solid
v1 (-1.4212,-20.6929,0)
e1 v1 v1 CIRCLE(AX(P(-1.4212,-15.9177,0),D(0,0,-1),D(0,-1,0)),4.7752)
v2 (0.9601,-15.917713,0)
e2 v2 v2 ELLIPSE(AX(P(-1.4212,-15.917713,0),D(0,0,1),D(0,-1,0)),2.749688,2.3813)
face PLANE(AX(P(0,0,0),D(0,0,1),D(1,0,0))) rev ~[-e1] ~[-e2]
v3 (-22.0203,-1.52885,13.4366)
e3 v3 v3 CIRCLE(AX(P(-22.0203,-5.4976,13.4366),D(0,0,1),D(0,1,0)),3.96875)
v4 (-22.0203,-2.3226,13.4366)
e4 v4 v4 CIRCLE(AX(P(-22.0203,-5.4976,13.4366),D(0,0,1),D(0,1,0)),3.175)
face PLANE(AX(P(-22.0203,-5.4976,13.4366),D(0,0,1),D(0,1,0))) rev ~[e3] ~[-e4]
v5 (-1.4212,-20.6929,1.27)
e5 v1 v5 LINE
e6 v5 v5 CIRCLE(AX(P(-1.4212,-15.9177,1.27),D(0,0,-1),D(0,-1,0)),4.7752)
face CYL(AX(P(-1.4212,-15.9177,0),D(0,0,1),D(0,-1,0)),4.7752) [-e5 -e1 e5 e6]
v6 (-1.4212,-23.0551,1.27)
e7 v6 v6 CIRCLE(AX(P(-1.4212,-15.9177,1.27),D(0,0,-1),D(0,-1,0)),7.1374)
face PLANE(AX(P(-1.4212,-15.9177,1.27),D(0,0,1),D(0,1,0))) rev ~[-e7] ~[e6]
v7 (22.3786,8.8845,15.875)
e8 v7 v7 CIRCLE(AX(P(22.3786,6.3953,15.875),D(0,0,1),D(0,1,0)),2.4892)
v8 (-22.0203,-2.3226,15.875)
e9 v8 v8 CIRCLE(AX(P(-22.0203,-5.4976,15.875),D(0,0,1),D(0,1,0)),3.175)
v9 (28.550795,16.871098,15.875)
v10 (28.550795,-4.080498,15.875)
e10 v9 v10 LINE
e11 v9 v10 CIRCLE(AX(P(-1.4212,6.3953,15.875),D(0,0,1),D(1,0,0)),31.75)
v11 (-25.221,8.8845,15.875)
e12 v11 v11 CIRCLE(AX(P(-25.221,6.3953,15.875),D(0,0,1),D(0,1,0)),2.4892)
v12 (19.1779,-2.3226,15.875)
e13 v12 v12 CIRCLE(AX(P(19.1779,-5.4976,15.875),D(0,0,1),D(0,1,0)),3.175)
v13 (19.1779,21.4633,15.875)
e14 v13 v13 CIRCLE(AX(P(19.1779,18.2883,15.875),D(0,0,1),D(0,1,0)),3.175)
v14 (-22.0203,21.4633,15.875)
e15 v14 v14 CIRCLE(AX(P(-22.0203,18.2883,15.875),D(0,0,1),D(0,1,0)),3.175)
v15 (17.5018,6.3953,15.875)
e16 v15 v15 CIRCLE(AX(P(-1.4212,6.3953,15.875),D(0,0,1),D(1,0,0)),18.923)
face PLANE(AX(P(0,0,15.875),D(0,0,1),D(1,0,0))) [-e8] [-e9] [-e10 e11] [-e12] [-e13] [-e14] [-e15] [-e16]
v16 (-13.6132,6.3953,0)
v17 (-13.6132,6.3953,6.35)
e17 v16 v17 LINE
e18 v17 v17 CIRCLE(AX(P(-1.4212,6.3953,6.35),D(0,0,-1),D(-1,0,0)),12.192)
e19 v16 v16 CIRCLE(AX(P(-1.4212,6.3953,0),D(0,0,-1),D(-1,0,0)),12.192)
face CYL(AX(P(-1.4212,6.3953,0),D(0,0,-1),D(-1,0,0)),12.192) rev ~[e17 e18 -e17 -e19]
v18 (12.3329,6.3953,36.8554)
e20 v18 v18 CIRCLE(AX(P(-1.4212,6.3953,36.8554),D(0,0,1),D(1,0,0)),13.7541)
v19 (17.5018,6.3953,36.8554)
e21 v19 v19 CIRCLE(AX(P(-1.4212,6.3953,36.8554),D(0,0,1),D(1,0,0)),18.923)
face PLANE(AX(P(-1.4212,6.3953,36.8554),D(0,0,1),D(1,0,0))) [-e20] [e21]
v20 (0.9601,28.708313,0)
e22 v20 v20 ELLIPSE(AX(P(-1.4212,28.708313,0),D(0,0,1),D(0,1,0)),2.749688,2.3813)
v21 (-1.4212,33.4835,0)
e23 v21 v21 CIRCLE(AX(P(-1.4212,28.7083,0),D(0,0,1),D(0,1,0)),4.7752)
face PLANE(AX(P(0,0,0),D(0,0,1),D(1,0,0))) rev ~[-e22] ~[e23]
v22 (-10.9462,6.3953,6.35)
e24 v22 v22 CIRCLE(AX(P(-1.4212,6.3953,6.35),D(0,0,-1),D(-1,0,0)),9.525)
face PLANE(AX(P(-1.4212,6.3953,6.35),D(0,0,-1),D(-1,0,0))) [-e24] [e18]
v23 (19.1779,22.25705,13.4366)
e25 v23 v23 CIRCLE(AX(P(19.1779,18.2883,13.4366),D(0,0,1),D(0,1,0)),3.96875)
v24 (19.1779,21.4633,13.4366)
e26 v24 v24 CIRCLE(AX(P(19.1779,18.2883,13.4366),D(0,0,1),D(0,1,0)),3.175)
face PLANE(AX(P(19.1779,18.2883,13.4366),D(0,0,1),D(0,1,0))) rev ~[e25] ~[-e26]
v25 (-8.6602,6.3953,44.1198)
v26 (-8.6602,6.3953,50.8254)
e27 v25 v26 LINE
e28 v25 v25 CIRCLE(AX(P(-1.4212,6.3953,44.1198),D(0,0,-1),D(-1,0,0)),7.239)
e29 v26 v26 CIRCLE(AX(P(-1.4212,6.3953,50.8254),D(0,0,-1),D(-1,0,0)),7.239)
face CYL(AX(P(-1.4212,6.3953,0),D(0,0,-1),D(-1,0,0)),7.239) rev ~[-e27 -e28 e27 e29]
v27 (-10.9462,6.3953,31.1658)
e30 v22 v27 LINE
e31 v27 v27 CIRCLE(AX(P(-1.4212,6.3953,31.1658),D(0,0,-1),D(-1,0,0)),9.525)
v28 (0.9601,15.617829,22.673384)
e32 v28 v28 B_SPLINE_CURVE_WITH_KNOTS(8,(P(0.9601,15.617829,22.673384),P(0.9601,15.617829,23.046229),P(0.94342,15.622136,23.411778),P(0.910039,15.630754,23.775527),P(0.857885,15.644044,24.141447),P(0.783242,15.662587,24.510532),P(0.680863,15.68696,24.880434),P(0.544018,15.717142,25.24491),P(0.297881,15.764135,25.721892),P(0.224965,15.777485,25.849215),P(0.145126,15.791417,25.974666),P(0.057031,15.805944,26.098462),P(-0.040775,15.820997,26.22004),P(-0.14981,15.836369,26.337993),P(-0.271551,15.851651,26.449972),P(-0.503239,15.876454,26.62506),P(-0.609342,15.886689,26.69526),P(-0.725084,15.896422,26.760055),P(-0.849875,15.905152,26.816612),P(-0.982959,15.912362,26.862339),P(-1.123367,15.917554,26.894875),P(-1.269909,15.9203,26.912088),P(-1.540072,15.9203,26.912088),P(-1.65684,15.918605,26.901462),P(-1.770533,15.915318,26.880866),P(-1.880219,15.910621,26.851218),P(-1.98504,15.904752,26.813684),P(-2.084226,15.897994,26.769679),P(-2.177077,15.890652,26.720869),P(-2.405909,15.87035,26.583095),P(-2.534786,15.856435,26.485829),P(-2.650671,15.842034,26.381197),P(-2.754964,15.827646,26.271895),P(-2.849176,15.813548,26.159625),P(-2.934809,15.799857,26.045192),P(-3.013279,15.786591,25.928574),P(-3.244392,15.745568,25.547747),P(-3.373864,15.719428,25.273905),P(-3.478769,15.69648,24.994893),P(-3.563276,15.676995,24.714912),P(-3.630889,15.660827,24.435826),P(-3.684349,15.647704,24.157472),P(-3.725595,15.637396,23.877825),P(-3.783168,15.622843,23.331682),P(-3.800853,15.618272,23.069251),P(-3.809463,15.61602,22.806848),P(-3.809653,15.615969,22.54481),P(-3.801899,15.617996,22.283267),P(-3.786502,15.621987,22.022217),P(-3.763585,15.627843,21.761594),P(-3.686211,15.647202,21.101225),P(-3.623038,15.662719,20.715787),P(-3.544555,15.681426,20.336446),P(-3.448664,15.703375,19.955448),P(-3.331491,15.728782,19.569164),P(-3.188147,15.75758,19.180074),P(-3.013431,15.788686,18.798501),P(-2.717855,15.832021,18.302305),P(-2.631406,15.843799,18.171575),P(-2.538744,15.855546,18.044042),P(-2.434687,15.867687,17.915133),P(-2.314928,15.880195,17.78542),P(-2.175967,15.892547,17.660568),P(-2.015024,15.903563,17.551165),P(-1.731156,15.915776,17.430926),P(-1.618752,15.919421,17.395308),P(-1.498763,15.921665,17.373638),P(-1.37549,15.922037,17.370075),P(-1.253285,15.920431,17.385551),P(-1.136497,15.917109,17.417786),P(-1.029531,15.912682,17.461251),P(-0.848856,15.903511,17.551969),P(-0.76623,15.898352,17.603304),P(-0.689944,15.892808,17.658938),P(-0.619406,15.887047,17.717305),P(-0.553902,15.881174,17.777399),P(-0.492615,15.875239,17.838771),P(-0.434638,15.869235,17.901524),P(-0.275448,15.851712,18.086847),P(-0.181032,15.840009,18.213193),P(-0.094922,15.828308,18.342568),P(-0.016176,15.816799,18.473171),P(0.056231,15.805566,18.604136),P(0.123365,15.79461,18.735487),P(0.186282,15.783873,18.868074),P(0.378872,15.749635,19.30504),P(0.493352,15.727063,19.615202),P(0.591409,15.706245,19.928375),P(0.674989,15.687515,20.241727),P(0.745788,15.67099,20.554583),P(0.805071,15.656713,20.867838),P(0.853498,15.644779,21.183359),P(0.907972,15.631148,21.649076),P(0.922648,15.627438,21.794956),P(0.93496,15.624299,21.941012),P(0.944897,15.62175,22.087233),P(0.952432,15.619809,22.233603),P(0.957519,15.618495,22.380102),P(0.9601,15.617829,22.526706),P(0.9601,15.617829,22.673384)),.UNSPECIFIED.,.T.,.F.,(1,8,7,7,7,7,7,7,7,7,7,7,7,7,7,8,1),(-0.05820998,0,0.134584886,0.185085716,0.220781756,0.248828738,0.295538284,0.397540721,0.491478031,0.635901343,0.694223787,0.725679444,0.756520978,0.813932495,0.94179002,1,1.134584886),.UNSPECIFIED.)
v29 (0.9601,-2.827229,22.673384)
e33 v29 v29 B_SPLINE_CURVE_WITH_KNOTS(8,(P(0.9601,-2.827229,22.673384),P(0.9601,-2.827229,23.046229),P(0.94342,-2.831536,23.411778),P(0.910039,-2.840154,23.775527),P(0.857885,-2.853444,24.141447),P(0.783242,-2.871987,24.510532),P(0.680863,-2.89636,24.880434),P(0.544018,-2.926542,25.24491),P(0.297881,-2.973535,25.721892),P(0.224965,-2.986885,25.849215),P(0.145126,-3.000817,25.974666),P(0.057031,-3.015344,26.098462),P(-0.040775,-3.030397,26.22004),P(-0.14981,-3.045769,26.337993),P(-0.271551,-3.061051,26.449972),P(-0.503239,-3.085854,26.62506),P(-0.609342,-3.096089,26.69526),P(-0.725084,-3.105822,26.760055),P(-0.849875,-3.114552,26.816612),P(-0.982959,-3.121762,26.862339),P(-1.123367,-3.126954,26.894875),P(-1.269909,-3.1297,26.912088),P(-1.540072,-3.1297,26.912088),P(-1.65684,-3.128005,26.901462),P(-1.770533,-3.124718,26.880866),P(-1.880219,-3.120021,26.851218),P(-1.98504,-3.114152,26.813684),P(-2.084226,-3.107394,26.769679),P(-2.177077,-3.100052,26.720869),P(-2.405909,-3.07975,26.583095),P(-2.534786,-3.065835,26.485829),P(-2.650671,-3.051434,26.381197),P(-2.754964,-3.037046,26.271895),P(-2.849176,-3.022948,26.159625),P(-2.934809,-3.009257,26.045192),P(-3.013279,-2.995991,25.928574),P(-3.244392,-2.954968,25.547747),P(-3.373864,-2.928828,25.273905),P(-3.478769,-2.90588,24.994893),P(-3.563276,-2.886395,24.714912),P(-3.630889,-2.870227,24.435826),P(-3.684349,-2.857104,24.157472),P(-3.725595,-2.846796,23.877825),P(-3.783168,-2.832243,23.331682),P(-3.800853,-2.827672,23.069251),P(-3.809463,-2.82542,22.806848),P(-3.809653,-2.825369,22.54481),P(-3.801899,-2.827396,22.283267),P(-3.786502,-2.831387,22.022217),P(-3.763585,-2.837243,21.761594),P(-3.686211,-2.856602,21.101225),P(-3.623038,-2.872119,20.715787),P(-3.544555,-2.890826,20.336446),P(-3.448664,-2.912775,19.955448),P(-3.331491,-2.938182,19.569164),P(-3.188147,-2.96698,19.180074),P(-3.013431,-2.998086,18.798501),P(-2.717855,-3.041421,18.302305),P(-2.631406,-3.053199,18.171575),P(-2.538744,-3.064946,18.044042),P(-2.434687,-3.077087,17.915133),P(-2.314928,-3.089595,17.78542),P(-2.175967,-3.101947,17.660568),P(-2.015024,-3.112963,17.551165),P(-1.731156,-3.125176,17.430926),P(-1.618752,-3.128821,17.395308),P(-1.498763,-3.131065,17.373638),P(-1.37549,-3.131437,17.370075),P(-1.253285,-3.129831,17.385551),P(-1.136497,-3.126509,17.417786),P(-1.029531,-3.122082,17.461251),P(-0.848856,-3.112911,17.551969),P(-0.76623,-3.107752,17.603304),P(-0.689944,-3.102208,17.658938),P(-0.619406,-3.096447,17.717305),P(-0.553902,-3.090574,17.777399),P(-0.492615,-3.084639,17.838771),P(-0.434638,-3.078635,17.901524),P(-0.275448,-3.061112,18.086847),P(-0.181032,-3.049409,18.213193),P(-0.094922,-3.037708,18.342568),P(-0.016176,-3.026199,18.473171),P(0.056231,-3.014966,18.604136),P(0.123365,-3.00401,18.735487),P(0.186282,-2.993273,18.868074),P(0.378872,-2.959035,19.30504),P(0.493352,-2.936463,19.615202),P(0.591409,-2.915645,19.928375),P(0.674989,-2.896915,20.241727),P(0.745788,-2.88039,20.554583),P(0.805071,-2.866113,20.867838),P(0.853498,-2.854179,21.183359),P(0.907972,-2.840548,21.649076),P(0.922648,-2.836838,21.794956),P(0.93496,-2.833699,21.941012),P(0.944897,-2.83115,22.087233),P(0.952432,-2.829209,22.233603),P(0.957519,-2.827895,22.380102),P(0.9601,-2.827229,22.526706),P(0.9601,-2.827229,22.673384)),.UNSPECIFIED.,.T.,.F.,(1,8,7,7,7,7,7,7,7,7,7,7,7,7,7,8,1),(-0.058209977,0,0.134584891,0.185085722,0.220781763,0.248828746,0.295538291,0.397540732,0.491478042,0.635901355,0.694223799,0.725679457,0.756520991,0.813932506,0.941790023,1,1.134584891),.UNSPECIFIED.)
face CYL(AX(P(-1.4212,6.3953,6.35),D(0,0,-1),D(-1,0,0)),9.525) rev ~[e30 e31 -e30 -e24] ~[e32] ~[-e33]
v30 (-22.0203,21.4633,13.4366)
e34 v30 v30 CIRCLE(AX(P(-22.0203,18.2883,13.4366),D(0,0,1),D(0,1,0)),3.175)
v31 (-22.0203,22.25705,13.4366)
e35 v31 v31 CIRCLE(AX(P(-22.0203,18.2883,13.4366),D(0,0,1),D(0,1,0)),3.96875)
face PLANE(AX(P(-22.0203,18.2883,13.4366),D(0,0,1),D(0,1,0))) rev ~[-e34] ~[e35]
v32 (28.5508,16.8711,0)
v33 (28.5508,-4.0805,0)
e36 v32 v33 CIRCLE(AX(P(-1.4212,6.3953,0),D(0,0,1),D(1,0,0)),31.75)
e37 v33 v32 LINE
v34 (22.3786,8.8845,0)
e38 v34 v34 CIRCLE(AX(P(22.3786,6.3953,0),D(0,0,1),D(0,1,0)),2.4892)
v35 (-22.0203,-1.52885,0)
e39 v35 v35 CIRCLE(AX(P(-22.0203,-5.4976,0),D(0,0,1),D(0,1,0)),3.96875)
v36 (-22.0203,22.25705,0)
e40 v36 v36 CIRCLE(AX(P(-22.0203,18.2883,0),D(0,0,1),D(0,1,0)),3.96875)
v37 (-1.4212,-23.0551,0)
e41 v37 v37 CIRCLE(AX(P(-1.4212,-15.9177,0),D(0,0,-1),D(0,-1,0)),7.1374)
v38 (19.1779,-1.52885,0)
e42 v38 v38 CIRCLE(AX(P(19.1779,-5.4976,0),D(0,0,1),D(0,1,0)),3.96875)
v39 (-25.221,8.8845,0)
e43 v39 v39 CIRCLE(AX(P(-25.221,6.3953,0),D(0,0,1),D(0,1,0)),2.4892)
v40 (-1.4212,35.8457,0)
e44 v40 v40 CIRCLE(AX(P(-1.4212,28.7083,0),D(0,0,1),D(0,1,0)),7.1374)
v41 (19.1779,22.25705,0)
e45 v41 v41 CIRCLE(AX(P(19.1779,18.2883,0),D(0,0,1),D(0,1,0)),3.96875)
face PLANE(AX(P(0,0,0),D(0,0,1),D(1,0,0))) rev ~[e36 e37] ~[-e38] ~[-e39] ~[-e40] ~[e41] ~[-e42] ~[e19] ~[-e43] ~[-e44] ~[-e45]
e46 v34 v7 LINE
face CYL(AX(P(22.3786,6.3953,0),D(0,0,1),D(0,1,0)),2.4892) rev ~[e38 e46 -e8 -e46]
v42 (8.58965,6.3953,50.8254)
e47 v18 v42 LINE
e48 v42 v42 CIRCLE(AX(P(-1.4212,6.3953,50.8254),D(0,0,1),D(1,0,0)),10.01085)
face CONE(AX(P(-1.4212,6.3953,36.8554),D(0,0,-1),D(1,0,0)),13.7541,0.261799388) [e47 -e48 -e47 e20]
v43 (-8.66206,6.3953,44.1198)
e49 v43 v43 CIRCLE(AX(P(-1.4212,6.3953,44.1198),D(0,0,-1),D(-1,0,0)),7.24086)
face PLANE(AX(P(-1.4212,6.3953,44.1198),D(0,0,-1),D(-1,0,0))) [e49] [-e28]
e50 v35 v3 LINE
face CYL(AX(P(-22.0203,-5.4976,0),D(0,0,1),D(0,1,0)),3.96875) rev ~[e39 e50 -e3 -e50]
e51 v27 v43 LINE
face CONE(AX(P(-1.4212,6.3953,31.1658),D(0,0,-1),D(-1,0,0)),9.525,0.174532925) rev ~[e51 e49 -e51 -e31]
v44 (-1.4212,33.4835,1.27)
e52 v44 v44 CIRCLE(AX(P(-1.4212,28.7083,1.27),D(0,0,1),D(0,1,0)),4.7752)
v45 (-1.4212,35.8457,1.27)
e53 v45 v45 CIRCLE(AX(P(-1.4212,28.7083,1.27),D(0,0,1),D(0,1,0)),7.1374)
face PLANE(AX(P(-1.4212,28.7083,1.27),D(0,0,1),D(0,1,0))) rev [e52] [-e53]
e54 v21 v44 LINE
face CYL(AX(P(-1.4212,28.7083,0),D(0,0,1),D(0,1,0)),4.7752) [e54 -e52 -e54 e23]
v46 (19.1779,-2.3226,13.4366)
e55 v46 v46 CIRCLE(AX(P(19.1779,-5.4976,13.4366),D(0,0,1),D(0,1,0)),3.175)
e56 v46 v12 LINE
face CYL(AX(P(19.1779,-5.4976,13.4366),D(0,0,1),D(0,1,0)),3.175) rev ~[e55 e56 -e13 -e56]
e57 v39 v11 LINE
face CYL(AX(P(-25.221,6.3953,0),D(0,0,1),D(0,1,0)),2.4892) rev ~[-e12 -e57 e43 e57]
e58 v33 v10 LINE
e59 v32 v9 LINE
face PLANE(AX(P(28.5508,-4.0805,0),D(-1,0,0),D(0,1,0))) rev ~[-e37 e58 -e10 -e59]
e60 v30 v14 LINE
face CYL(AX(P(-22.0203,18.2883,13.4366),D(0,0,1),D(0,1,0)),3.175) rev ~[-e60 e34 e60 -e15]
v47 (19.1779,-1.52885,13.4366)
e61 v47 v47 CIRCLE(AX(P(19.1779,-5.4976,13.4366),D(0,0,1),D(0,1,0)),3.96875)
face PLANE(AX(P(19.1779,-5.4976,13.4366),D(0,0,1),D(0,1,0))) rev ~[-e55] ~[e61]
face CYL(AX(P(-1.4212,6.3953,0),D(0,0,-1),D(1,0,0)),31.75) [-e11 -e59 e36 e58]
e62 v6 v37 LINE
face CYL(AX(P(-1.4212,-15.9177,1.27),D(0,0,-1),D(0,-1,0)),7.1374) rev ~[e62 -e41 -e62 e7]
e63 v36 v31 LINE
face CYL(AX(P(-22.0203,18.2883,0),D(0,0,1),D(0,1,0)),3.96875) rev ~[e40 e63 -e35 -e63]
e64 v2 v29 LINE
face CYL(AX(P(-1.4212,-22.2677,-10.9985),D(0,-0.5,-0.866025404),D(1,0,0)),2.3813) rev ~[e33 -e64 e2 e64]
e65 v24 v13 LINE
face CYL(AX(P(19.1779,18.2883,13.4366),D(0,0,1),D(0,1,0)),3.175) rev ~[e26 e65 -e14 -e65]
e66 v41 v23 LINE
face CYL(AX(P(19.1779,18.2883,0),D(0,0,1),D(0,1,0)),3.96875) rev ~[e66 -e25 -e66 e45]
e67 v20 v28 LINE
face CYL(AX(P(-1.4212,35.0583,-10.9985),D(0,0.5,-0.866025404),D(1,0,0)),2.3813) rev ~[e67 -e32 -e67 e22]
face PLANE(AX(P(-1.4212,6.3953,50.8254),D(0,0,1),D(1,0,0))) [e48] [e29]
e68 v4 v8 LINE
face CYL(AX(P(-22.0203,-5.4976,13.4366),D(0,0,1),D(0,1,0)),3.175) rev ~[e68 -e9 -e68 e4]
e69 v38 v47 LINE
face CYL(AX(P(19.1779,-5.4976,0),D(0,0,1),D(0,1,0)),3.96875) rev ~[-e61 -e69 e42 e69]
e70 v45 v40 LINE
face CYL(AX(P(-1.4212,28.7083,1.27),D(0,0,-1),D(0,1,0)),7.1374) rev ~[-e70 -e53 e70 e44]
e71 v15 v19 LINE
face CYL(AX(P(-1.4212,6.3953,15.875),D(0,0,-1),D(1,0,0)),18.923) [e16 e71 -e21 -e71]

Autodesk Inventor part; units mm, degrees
sketch "Sketch1" plane through (0, 0, 0) normal (0, 0, 1) x (1, 0, 0)
  circle A0 centre (-1.4212, 6.3953) radius 31.75
  dimension "d0" = 63.5
extrude "Extrusion1" add sketch "Sketch1" along normal blind 15.875
sketch "Sketch2" plane through (-1.4212, 6.3953, 15.875) normal (0, 0, 1) x (1, 0, 0)
  circle A0 centre (0, 0) radius 31.75 projected
  circle A1 centre (0, 0) radius 18.923
  dimension "d3" = 37.846
extrude "Extrusion2" add sketch "Sketch2" along normal blind 20.9804 contours A1
sketch "Sketch3" plane through (-1.4212, 6.3953, 36.8554) normal (0, 0, 1) x (1, 0, 0)
  circle A0 centre (0, 0) radius 18.923 projected
  circle A1 centre (0, 0) radius 13.7541
  dimension "d6" = 27.5082
extrude "Extrusion3" add sketch "Sketch3" along normal blind 13.97 draft -15 contours A1
sketch "Sketch5" plane through (-1.4212, 6.3953, 0) normal (0, 0, -1) x (-1, 0, 0)
  circle A0 centre (0, 0) radius 31.75 projected
  circle A1 centre (0, 0) radius 6.096
  dimension "d12" = 12.192
extrude "Extrusion5" cut sketch "Sketch5" against normal blind 86.2076 contours A1
sketch "Sketch6" plane through (-1.4212, 6.3953, 0) normal (0, 0, -1) x (-1, 0, 0)
  circle A0 centre (0, 0) radius 31.75 projected
  circle A1 centre (0, 0) radius 6.731
  dimension "d15" = 13.462
extrude "Extrusion6" cut sketch "Sketch6" against normal blind 77.0128 contours A1
sketch "Sketch7" plane through (-1.4212, 6.3953, 0) normal (0, 0, -1) x (-1, 0, 0)
  circle A0 centre (0, 0) radius 31.75 projected
  circle A1 centre (0, 0) radius 7.239
  dimension "d18" = 14.478
extrude "Extrusion7" cut sketch "Sketch7" against normal blind 66.6242 contours A1
sketch "Sketch8" plane through (-1.4212, 6.3953, 0) normal (0, 0, -1) x (-1, 0, 0)
  circle A0 centre (0, 0) radius 7.239 projected
  circle A1 centre (0, 0) radius 31.75 projected
  circle A2 centre (0, 0) radius 12.192
  dimension "d21" = 24.384
extrude "Extrusion8" cut sketch "Sketch8" against normal blind 6.35 contours A2
sketch "Sketch9" plane through (-1.4212, 6.3953, 6.35) normal (0, 0, -1) x (-1, 0, 0)
  circle A0 centre (0, 0) radius 7.239 projected
  circle A1 centre (0, 0) radius 12.192 projected
  circle A2 centre (0, 0) radius 9.525
  dimension "d24" = 19.05
extrude "Extrusion9" cut sketch "Sketch9" against normal blind 24.8158 contours A2
sketch "Sketch10" plane through (-1.4212, 6.3953, 31.1658) normal (0, 0, -1) x (-1, 0, 0)
  circle A0 centre (0, 0) radius 9.525 projected
extrude "Extrusion10" cut sketch "Sketch10" against normal blind 12.954 draft -10
sketch "Sketch11" plane through (-1.4212, 6.3953, 0) normal (0, 0, -1) x (-1, 0, 0)
  circle A0 centre (0, 0) radius 31.75 projected
  line L0 (0, 0) -> (0, 36.2783)
  line L1 (-29.972, -10.4758) -> (-29.972, 10.4758)
  dimension "d29" = 29.972
extrude "Extrusion11" cut sketch "Sketch11" against normal through all contours L1 A0 picked at (-30.4983, 1.1837)
ref_plane "Work Plane1" through (-1.4212, 6.3953, 6.35) normal (0, 1, 0) x (0, 0, 1)
ref_plane "Work Plane2" through (-1.4212, 6.3953, 6.35) normal (1, 0, 0) x (0, 0, 1)
sketch "Sketch12" plane through (0, 0, 0) normal (0, 0, -1) x (-1, 0, 0)
  circle A0 centre (1.4212, 6.3953) radius 12.192 projected
  line L0 (-47.0674, 6.3953) -> (39.3434, 6.3953) projected
  circle A1 centre (1.4212, 6.3953) radius 23.7998
  point P0 (-22.3786, 6.3953)
  point P1 (25.221, 6.3953)
  dimension "d34" = 47.5996
hole "Hole1" at (22.3786, 6.3953, 0) at (-25.221, 6.3953, 0) direction (0, 0, 1) diameter 4.9784 end through all thread size "1/4-20 UNC" class "1B" standard "ANSI Unified Screw Threads"
sketch "Sketch13" plane through (0, 0, 0) normal (0, 0, -1) x (-1, 0, 0)
  circle A0 centre (1.4212, 6.3953) radius 12.192 projected
  circle A1 centre (1.4212, 6.3953) radius 23.7858
  line L0 (1.4212, 6.3953) -> (23.4182, 19.0953)
  line L1 (1.4212, 6.3953) -> (-20.5759, 19.0953)
  line L2 (1.4212, 6.3953) -> (-20.5759, -6.3047)
  line L3 (1.4212, 6.3953) -> (23.4182, -6.3047)
  point P0 (-19.1779, 18.2883)
  point P1 (22.0203, 18.2883)
  point P2 (22.0203, -5.4976)
  point P3 (-19.1779, -5.4976)
hole "Hole2" at (19.1779, 18.2883, 0) at (-22.0203, 18.2883, 0) at (-22.0203, -5.4976, 0) at (19.1779, -5.4976, 0) direction (0, 0, 1) diameter 6.35 end through all counterbore diameter 7.9375 counterbore depth 13.4366
sketch "Sketch14" plane through (-1.4212, 6.3953, 6.35) normal (1, 0, 0) x (0, 0, 1)
  line L0 (-6.35, -22.313) -> (18.656, -7.8757)
ref_plane "Work Plane3" through (-1.4212, 28.7083, 0) normal (0, -0.5, 0.8660254) x (1, 0, 0)
ref_plane "Work Plane4" through (-1.4212, 35.0583, -10.9985) normal (0, -0.5, 0.8660254) x (1, 0, 0)
sketch "Sketch16" plane through (-1.4212, 35.0583, -10.9985) normal (0, -0.5, 0.8660254) x (1, 0, 0)
  circle A0 centre (0, 0) radius 2.3813 projected
extrude "Extrusion12" cut sketch "Sketch16" along normal up to next
mirror "Mirror1" about plane through (-1.4212, 6.3953, 6.35) normal (0, 1, 0) of "Extrusion12"
sketch "Sketch17" plane through (-1.4212, 6.3953, 6.35) normal (1, 0, 0) x (0, 0, 1)
  line L0 (-6.35, -25.0626) -> (-6.35, -19.5634) projected
  line L1 (-6.35, -27.0882) -> (-5.08, -27.0882)
  line L2 (-5.08, -27.0882) -> (-5.08, -29.4504)
  line L3 (-5.08, -29.4504) -> (-6.35, -29.4504)
  line L4 (-6.35, -22.313) -> (-3.5699, -22.313)
  line L5 (-6.35, -27.0882) -> (-6.35, -29.4504)
revolve "Revolution1" cut sketch "Sketch17" angle 360 about axis through (-1.4212, 28.7083, 0) along (0, 0, 1)
mirror "Mirror2" about plane through (-1.4212, 6.3953, 6.35) normal (0, 1, 0) of "Revolution1"
properties part number "Core"
